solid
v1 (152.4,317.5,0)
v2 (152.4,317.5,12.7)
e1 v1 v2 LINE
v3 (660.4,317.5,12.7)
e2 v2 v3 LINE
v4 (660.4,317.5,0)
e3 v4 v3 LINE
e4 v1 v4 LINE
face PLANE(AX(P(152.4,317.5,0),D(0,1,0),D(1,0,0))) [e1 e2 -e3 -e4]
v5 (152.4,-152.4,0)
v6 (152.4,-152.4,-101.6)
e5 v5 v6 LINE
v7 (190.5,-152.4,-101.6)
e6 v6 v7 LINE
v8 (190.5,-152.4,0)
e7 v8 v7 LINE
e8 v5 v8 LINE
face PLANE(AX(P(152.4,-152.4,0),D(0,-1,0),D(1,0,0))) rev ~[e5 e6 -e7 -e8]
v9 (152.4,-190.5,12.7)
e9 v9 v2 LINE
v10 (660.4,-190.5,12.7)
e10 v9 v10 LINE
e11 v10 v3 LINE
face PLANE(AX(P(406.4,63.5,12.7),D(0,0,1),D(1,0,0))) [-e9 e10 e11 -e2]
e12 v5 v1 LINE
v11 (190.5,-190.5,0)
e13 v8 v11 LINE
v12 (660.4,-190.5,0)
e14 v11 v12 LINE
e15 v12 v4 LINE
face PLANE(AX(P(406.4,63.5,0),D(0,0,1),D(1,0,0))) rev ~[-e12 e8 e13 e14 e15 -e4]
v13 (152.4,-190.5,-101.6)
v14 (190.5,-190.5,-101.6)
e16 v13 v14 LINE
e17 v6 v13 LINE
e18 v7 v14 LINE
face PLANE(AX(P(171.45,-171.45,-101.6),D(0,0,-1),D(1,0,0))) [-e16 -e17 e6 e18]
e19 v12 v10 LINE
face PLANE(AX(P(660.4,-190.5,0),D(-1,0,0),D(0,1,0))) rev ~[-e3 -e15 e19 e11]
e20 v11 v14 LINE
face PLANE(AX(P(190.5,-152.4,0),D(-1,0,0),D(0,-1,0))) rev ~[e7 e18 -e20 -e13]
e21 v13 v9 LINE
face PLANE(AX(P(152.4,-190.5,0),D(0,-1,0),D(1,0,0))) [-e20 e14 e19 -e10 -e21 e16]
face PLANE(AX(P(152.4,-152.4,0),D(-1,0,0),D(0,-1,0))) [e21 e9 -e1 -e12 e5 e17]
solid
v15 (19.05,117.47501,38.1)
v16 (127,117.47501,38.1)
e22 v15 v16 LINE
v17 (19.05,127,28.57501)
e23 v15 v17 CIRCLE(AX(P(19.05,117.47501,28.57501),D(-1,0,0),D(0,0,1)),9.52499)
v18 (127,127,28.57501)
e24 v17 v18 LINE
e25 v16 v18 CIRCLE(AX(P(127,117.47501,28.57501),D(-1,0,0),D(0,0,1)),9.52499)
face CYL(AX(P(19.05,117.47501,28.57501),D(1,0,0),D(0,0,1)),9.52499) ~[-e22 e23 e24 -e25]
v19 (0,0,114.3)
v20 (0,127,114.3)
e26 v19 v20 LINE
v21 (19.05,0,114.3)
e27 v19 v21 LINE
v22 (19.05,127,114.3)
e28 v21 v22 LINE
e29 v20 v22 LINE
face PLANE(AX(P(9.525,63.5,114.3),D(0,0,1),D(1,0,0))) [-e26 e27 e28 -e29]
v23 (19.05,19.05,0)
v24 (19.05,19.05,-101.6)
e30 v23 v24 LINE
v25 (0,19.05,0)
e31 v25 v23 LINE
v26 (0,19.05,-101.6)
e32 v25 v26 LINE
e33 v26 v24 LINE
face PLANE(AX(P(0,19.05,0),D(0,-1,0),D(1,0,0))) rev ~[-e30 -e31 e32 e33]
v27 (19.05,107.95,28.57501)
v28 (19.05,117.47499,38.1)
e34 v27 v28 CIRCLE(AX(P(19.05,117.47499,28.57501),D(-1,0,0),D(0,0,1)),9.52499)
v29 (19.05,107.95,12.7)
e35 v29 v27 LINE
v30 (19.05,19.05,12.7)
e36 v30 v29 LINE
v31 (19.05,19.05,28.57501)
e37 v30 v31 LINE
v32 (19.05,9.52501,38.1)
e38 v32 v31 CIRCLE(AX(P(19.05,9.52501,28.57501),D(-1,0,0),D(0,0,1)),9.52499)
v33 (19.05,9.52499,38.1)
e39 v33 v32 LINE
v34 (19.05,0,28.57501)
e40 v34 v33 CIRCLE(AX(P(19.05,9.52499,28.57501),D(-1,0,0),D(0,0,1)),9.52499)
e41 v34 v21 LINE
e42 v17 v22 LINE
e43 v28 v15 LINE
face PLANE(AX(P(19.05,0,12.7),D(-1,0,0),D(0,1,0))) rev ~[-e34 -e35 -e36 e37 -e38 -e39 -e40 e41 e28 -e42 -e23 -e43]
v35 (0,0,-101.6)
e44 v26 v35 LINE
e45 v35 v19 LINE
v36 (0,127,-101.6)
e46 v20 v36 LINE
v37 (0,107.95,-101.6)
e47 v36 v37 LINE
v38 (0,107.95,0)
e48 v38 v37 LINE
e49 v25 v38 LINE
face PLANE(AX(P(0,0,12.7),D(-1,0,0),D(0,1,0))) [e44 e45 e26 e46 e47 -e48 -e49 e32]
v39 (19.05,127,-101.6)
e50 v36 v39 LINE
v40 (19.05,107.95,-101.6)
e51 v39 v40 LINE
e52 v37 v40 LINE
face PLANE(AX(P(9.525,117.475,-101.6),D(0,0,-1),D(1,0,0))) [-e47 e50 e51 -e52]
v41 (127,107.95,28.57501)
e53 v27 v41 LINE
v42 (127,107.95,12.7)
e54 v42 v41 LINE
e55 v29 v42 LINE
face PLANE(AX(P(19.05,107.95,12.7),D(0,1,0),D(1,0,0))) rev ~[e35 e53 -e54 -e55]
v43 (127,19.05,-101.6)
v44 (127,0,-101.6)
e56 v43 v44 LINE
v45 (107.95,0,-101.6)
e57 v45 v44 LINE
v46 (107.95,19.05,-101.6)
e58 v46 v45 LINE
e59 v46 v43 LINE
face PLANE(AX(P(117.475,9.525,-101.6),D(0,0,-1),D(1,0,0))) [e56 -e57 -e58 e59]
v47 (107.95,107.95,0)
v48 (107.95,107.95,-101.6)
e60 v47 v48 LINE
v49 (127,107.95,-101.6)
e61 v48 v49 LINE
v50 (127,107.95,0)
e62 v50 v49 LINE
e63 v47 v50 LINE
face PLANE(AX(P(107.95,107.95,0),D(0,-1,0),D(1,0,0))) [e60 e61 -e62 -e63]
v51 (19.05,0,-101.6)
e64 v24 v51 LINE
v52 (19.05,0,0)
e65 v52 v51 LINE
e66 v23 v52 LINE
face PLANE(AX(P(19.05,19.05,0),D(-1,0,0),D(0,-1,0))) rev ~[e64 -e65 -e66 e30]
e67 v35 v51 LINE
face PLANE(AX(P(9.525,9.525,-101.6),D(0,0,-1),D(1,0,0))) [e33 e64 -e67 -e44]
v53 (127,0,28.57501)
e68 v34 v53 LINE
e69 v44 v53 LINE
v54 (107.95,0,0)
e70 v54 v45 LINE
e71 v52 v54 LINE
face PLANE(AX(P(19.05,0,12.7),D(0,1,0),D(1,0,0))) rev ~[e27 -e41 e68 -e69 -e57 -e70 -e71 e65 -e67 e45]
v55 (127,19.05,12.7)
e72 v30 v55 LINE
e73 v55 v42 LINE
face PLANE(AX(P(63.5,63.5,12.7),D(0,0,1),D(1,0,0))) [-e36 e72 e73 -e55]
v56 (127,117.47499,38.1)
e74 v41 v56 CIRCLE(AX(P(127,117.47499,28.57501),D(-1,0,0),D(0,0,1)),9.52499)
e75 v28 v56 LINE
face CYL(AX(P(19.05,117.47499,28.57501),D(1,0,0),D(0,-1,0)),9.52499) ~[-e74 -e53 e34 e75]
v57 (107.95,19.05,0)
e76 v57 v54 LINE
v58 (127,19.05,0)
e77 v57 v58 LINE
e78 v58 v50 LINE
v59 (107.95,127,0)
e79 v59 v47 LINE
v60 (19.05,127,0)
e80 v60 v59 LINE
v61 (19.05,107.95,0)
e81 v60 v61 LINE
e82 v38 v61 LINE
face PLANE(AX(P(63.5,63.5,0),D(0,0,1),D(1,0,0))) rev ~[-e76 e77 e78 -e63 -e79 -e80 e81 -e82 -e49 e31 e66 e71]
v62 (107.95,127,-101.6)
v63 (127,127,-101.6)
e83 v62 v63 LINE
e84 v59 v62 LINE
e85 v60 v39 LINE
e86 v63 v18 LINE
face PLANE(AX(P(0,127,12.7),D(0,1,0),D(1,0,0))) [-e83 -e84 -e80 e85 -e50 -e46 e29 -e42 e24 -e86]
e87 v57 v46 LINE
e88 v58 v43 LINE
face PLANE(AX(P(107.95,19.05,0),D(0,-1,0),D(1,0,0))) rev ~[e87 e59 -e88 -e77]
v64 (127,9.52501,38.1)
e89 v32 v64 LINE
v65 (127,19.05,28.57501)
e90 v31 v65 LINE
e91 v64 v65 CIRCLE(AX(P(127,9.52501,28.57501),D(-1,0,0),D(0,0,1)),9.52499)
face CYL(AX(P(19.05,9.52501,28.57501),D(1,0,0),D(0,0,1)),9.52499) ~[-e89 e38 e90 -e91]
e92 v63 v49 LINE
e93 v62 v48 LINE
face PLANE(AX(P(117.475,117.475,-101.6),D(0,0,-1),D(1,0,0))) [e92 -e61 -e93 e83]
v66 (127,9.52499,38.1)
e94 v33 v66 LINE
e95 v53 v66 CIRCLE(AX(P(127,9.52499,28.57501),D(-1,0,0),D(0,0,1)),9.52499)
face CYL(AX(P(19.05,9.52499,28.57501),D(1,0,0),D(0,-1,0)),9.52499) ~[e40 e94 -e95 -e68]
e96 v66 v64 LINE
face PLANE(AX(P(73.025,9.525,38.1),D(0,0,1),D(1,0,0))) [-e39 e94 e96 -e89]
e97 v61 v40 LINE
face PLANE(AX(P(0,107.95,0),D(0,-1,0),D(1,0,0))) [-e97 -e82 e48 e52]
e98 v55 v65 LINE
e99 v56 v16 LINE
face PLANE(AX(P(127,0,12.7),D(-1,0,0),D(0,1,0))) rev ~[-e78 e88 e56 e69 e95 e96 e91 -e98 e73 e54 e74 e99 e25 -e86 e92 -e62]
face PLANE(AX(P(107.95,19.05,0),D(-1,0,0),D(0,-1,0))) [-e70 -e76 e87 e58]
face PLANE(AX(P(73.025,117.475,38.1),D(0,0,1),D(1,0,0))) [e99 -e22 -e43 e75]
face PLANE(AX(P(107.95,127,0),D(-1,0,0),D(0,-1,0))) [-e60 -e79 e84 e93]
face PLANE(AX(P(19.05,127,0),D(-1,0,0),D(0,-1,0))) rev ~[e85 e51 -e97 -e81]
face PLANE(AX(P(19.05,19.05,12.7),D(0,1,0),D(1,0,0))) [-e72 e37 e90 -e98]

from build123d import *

# Parameters (mm, degrees)
F0_W      = 127
F0_H      = 127
F1_DEPTH  = 12.7
F2_W      = 19.05
F2_H      = 19.05
F3_DEPTH  = 101.6
F4_W      = 19.05
F4_H      = 127
F5_DEPTH  = 101.6
F6_W      = 107.95
F6_H      = 19.05
F7_DEPTH  = 25.4
F8_R      = 9.52499
F9_W      = 508
F9_H      = 508
F10_DEPTH = 12.7
F11_W     = 38.1
F11_H     = 38.1
F12_DEPTH = 101.6


# Not quite as in the source:
# - a fillet or chamfer is up to 0.001 mm smaller than in the source, because OpenCascade refuses the exact size


with BuildPart() as f1:
    # F0 (on Top) → F1 (new body)
    with BuildSketch(Plane.XY):
        with Locations((63.5, 63.5)):
            Rectangle(F0_W, F0_H)
    extrude(amount=F1_DEPTH)

    # F2 (on face) → F3 (join)
    with BuildSketch(Plane(origin=(0, 0, 0), x_dir=(1, 0, 0), z_dir=(0, 0, -1))):
        with Locations((9.525, -9.525)):
            Rectangle(F2_W, F2_H)
        with Locations((9.525, -117.475)):
            Rectangle(F2_W, F2_H)
        with Locations((117.475, -117.475)):
            Rectangle(F2_W, F2_H)
        with Locations((117.475, -9.525)):
            Rectangle(F2_W, F2_H)
    extrude(amount=F3_DEPTH)

    # F4 (on face) → F5 (join)
    with BuildSketch(Plane.XY.offset(12.7)):
        with Locations((9.525, 63.5)):
            Rectangle(F4_W, F4_H)
    extrude(amount=F5_DEPTH)

    # F6 (on face) → F7 (join)
    with BuildSketch(Plane.XY.offset(12.7)):
        with Locations((73.025, 9.525)):
            Rectangle(F6_W, F6_H)
        with Locations((73.025, 117.475)):
            Rectangle(F6_W, F6_H)
    extrude(amount=F7_DEPTH)

    # F8 (radius 9.525 in the source; OpenCascade refuses exactly that, so slightly less here)
    f8_edges = [f1.edges().sort_by_distance(p)[0] for p in [
        (73.025, 0, 38.1),
        (73.025, 19.05, 38.1),
        (73.025, 127, 38.1),
        (73.025, 107.95, 38.1),
    ]]
    fillet(f8_edges, radius=F8_R)


with BuildPart() as f10:
    # F9 (on Top) → F10 (new body)
    with BuildSketch(Plane.XY):
        with Locations((406.4, 63.5)):
            Rectangle(F9_W, F9_H)
    extrude(amount=F10_DEPTH)

    # F11 (on face) → F12 (join, through all)
    with BuildSketch(Plane(origin=(0, 0, 0), x_dir=(1, 0, 0), z_dir=(0, 0, -1))):
        with Locations((171.45, 171.45)):
            Rectangle(F11_W, F11_H)
    extrude(amount=F12_DEPTH)


solid = Compound([f1.part, f10.part])
